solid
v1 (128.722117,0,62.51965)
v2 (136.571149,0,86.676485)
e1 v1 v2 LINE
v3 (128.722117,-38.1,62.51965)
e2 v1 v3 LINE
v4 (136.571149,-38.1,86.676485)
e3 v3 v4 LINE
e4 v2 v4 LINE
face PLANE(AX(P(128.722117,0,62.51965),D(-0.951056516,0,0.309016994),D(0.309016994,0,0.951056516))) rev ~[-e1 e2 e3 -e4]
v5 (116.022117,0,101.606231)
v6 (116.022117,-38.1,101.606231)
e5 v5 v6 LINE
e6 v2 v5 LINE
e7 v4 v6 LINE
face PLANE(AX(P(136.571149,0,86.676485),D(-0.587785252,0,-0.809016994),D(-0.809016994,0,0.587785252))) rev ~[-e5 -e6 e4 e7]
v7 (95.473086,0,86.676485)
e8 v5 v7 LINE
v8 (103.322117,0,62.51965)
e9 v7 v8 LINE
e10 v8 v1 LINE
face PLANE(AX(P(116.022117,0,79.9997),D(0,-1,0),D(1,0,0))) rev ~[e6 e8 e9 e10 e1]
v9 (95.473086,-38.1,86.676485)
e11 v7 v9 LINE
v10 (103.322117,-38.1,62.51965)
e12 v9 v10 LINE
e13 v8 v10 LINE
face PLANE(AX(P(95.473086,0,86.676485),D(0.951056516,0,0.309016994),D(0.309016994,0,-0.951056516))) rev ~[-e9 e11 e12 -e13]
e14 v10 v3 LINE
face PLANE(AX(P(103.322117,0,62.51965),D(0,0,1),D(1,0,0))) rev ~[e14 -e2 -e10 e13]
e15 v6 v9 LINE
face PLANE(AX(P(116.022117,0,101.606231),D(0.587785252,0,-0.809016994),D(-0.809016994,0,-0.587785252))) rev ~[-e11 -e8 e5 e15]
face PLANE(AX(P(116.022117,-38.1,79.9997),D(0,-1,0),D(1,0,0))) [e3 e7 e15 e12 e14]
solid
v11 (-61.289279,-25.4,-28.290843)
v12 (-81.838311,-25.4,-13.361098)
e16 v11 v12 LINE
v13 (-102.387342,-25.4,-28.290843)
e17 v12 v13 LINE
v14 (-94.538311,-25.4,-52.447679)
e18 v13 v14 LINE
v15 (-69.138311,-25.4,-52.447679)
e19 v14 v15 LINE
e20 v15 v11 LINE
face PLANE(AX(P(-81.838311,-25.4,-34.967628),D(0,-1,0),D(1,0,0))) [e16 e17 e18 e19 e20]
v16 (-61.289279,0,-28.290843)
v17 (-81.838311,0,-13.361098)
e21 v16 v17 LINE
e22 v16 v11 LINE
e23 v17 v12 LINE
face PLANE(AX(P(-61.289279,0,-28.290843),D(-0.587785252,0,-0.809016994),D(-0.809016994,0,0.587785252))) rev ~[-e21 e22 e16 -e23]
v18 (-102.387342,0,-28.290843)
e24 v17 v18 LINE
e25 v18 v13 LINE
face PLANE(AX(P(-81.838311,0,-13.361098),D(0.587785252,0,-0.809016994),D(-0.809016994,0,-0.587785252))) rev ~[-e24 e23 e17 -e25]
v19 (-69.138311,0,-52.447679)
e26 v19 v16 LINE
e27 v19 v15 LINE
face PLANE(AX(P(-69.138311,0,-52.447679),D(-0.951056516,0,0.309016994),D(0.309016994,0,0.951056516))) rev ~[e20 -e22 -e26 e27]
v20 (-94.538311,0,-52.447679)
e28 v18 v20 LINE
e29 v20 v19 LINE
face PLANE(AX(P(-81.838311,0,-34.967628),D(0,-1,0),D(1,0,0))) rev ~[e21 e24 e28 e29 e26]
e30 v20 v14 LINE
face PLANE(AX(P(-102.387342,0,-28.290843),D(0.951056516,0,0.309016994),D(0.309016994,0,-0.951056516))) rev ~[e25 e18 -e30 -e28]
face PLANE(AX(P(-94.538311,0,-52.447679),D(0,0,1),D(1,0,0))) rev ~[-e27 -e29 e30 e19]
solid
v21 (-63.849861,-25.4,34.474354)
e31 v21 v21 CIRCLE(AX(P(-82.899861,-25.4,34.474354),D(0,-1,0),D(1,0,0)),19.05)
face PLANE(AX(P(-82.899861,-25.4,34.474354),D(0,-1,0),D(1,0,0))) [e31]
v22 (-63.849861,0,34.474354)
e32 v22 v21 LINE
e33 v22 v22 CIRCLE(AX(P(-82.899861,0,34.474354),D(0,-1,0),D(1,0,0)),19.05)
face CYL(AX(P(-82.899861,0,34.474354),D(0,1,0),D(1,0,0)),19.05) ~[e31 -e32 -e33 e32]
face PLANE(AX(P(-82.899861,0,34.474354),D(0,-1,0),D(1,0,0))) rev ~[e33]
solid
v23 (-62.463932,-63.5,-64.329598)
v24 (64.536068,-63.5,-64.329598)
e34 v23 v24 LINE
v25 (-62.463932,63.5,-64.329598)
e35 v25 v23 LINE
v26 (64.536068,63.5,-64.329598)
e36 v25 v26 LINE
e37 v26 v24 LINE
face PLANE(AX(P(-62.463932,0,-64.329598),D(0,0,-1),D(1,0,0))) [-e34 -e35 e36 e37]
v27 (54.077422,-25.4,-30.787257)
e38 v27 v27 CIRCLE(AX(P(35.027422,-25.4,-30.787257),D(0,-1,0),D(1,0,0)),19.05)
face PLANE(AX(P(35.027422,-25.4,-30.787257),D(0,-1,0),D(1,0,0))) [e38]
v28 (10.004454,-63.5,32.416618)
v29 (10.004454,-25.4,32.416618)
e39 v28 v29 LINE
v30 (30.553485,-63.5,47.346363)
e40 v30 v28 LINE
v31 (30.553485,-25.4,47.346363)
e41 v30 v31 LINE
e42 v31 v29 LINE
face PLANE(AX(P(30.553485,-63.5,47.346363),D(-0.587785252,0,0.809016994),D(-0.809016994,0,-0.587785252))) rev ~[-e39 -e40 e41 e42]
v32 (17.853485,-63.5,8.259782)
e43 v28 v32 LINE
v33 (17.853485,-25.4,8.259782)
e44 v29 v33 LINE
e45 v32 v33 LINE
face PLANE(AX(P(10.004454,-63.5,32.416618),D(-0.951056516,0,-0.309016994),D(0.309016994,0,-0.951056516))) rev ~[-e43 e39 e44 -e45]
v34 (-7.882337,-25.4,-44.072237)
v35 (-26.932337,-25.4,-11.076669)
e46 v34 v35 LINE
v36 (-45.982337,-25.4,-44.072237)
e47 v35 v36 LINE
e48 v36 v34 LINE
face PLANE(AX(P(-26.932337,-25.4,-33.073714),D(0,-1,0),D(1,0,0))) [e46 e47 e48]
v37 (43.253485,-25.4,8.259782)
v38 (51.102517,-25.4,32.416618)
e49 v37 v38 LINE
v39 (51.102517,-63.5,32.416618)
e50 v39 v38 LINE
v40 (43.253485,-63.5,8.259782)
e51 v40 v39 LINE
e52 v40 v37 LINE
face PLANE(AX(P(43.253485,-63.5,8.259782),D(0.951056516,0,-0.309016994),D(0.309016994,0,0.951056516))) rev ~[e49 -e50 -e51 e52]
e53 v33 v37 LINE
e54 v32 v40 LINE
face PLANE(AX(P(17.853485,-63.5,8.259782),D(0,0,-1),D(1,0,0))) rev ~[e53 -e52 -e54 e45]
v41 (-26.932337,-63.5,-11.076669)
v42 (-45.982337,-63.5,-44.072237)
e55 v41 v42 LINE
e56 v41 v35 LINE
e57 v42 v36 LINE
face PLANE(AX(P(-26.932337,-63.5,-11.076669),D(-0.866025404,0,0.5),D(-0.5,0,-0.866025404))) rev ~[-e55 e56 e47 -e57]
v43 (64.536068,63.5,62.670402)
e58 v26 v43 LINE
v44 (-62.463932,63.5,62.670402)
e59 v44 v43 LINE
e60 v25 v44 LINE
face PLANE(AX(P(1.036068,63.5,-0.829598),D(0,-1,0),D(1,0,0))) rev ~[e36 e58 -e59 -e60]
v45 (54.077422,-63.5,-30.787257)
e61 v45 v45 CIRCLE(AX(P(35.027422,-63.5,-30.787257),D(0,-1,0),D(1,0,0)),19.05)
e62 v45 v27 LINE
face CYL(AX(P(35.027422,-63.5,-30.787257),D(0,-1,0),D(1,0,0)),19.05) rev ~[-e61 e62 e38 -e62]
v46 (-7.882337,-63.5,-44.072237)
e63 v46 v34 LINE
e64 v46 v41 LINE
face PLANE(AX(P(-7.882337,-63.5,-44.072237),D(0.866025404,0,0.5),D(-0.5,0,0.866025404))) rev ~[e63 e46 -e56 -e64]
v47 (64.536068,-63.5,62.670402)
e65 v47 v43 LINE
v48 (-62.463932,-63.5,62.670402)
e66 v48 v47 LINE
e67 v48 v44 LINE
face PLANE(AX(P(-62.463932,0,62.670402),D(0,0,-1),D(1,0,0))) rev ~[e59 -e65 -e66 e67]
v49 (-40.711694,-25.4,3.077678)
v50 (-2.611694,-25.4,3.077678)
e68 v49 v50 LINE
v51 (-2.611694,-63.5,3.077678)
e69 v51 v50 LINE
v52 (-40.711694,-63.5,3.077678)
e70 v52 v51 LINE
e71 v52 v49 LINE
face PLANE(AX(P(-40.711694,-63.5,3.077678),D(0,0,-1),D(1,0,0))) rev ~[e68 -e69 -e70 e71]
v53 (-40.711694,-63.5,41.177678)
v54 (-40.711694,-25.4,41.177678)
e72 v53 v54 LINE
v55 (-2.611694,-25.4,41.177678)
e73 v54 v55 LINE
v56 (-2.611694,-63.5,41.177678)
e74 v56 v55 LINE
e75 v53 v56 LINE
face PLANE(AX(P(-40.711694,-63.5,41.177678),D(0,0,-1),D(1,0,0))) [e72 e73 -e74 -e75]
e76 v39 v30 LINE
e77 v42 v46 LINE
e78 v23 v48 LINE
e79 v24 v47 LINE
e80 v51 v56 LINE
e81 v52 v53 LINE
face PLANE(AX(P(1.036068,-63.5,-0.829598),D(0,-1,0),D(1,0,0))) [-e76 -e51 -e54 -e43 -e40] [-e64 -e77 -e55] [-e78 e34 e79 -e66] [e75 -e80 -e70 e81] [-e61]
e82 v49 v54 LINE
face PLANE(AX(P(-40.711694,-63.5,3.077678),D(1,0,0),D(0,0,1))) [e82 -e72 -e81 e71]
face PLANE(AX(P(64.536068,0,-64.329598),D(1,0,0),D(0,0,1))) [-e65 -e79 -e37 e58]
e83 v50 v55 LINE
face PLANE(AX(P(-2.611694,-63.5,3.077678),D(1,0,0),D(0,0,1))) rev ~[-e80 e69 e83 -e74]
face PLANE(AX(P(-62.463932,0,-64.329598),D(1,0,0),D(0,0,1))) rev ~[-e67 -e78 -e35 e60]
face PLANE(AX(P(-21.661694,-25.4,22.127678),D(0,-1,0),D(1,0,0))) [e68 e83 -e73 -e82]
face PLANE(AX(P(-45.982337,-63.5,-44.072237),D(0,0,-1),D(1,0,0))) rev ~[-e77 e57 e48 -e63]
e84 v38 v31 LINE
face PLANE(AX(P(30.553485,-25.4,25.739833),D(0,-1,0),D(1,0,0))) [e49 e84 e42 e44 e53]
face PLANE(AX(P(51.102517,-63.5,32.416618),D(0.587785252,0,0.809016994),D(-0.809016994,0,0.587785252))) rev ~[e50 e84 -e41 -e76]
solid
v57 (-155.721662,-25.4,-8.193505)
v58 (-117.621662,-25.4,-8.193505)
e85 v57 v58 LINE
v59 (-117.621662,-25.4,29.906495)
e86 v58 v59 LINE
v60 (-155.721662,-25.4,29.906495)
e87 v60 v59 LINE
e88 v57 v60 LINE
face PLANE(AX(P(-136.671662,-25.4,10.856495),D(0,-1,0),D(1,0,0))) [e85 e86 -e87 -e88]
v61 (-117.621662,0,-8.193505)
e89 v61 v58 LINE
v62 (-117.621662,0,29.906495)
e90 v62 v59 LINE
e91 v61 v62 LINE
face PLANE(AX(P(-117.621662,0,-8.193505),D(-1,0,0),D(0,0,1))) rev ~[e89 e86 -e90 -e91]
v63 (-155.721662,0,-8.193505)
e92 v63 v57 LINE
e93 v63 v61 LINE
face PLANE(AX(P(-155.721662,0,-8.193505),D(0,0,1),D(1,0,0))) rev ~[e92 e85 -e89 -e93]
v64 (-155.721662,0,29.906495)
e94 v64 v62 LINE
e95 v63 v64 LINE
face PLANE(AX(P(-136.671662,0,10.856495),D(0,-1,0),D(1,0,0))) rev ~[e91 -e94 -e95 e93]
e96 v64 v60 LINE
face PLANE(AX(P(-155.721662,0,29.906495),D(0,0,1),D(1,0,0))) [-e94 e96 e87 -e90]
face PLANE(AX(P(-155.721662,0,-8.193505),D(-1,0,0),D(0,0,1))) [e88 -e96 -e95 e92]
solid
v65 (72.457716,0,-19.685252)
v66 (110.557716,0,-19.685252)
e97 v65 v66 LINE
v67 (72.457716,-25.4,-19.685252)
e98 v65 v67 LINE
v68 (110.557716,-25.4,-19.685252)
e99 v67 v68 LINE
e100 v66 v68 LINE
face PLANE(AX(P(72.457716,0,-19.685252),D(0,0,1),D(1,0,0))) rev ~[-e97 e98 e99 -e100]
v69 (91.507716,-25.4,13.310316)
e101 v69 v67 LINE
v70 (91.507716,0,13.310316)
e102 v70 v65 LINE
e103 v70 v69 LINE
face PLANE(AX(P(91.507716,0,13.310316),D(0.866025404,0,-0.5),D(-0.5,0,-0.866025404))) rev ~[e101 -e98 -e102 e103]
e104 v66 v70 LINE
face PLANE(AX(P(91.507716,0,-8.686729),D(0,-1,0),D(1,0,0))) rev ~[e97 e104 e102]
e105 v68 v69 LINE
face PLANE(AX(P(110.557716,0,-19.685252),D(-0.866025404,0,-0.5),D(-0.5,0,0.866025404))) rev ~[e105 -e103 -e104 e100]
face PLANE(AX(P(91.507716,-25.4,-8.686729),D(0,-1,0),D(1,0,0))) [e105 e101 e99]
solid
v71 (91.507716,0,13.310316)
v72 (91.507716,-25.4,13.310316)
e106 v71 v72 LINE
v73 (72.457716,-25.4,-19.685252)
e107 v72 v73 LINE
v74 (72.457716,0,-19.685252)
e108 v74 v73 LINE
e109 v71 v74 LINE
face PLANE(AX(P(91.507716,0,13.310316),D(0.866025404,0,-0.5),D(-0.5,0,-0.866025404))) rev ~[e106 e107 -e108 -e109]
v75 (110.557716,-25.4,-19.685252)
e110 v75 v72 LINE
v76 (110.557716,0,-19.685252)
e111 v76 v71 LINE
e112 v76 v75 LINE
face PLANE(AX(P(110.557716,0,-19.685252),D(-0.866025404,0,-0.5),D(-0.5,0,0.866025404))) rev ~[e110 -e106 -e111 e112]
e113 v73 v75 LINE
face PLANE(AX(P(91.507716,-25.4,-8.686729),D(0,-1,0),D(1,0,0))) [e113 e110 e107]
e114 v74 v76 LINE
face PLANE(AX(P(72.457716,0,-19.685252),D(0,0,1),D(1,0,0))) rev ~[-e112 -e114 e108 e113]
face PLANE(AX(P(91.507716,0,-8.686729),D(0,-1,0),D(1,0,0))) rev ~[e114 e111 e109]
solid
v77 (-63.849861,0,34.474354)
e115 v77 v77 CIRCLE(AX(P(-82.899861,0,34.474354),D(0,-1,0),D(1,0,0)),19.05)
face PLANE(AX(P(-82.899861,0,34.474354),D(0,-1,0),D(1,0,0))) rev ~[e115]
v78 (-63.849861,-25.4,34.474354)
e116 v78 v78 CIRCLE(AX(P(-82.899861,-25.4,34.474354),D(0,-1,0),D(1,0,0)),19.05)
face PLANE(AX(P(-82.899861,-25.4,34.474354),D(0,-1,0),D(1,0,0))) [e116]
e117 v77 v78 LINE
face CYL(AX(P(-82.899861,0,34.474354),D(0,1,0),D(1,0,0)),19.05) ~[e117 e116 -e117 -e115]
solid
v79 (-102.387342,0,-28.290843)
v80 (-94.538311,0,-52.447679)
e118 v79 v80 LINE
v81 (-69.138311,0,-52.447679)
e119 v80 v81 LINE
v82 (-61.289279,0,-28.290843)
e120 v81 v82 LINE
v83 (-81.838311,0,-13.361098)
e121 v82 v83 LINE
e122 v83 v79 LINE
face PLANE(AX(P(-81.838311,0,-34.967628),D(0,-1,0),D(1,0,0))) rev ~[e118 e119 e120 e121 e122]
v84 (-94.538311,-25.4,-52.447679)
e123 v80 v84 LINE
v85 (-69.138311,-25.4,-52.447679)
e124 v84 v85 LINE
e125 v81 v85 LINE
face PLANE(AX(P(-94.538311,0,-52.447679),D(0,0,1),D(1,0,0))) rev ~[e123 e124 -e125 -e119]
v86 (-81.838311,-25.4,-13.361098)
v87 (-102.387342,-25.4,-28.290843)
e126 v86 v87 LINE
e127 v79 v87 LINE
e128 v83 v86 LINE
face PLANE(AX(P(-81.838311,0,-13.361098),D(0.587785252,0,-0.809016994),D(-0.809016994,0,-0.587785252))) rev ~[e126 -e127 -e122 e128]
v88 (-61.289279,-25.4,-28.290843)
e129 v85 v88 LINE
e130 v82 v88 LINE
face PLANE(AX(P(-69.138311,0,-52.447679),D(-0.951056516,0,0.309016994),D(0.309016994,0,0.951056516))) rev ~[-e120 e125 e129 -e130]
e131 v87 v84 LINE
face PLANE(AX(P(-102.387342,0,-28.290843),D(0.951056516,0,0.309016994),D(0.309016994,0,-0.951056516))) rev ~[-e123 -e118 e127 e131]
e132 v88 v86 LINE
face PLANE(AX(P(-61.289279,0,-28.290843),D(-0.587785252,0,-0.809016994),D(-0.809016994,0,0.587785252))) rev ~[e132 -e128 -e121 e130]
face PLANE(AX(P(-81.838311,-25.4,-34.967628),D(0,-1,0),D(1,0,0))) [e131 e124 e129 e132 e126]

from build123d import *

# Parameters (mm, degrees)
F0_W      = 127
F0_H      = 127
F1_DEPTH  = 63.5
F2_W      = 38.1
F2_H      = 38.1
F3_DEPTH  = 38.1
F5_DEPTH  = 38.1
F6_R      = 19.05
F8_DEPTH  = 38.1
F9_DEPTH  = 38.1
F10_W     = 38.1
F10_H     = 38.1
F11_DEPTH = 25.4
F13_DEPTH = 25.4
F12_R     = 19.05
F14_DEPTH = 25.4
F16_DEPTH = 38.1


# Not quite as in the source:
# - a feature of the source that left no trace in its solid (it failed there, or was rolled back) is left out
# - a feature names something its author has since deleted; it is built from what else it names


with BuildPart() as f1:
    # F0 (on Front) → F1 (new body, symmetric)
    with BuildSketch(Plane.XZ):
        with Locations((1.0360684865, -0.8295979351)):
            Rectangle(F0_W, F0_H)
    extrude(amount=F1_DEPTH, both=True)

    # F2 (on face) → F3 (cut)
    with BuildSketch(Plane.XZ.offset(63.5)):
        with Locations((-21.6616940452, 22.1276779154)):
            Rectangle(F2_W, F2_H)
    extrude(amount=-F3_DEPTH, mode=Mode.SUBTRACT)

    # F4 (on face) → F5 (cut)
    with BuildSketch(Plane.XZ.offset(63.5)):
        Polygon((43.2534851908, 8.2597824623), (51.102516848, 32.4166179762), (30.5534851908, 47.3463633845), (10.0044535337, 32.4166179762), (17.8534851908, 8.2597824623), align=None)
    extrude(amount=-F5_DEPTH, mode=Mode.SUBTRACT)

    # F6 (on face) → F8 (cut)
    with BuildSketch(Plane.XZ.offset(63.5)):
        with Locations((35.0274220109, -30.7872574776)):
            Circle(F6_R)
        Polygon((-26.9323371144, -11.076669144), (-45.9823371144, -44.0722370282), (-7.8823371144, -44.0722370282), align=None)
    extrude(amount=-F8_DEPTH, mode=Mode.SUBTRACT)

    # F6 (on face) → F9 (cut)
    with BuildSketch(Plane.XZ.offset(63.5)):
        with Locations((35.0274220109, -30.7872574776)):
            Circle(F6_R)
        Polygon((-26.9323371144, -11.076669144), (-45.9823371144, -44.0722370282), (-7.8823371144, -44.0722370282), align=None)
    extrude(amount=-F9_DEPTH, mode=Mode.SUBTRACT)


with BuildPart() as f11:
    # F10 (on Front) → F11 (new body)
    with BuildSketch(Plane.XZ):
        with Locations((-136.6716623306, 10.8564948447)):
            Rectangle(F10_W, F10_H)
    extrude(amount=F11_DEPTH)


with BuildPart() as f13:
    # F12 (on Front) → F13 (new body)
    with BuildSketch(Plane.XZ):
        Polygon((-102.3873424113, -28.2908431806), (-94.5383107541, -52.4476786945), (-69.1383107541, -52.4476786945), (-61.289279097, -28.2908431806), (-81.8383107541, -13.3610977723), align=None)
    extrude(amount=F13_DEPTH)


with BuildPart() as f13b:
    # F12 (on Front) → F13, piece 2 (new body)
    with BuildSketch(Plane.XZ):
        with Locations((-82.8998610377, 34.4743542373)):
            Circle(F12_R)
    extrude(amount=F13_DEPTH)


with BuildPart() as f13c:
    # F12 (on Front) → F13, piece 3 (new body)
    with BuildSketch(Plane.XZ):
        Polygon((91.5077158689, 13.3103162459), (72.4577158689, -19.6852516383), (110.5577158689, -19.6852516383), align=None)
    extrude(amount=F13_DEPTH)


with BuildPart() as f14:
    # F12 (on Front) → F14 (new body)
    with BuildSketch(Plane.XZ):
        Polygon((-102.3873424113, -28.2908431806), (-94.5383107541, -52.4476786945), (-69.1383107541, -52.4476786945), (-61.289279097, -28.2908431806), (-81.8383107541, -13.3610977723), align=None)
    extrude(amount=F14_DEPTH)


with BuildPart() as f14b:
    # F12 (on Front) → F14, piece 2 (new body)
    with BuildSketch(Plane.XZ):
        with Locations((-82.8998610377, 34.4743542373)):
            Circle(F12_R)
    extrude(amount=F14_DEPTH)


with BuildPart() as f14c:
    # F12 (on Front) → F14, piece 3 (new body)
    with BuildSketch(Plane.XZ):
        Polygon((91.5077158689, 13.3103162459), (72.4577158689, -19.6852516383), (110.5577158689, -19.6852516383), align=None)
    extrude(amount=F14_DEPTH)


with BuildPart() as f16:
    # F15 (on Front) → F16 (new body)
    with BuildSketch(Plane.XZ):
        Polygon((128.7221174359, 62.5196497987), (136.5711490931, 86.6764853125), (116.0221174359, 101.6062307208), (95.4730857788, 86.6764853125), (103.3221174359, 62.5196497987), align=None)
    extrude(amount=F16_DEPTH)


solid = Compound([f1.part, f11.part, f13.part, f13b.part, f13c.part, f14.part, f14b.part, f14c.part, f16.part])
